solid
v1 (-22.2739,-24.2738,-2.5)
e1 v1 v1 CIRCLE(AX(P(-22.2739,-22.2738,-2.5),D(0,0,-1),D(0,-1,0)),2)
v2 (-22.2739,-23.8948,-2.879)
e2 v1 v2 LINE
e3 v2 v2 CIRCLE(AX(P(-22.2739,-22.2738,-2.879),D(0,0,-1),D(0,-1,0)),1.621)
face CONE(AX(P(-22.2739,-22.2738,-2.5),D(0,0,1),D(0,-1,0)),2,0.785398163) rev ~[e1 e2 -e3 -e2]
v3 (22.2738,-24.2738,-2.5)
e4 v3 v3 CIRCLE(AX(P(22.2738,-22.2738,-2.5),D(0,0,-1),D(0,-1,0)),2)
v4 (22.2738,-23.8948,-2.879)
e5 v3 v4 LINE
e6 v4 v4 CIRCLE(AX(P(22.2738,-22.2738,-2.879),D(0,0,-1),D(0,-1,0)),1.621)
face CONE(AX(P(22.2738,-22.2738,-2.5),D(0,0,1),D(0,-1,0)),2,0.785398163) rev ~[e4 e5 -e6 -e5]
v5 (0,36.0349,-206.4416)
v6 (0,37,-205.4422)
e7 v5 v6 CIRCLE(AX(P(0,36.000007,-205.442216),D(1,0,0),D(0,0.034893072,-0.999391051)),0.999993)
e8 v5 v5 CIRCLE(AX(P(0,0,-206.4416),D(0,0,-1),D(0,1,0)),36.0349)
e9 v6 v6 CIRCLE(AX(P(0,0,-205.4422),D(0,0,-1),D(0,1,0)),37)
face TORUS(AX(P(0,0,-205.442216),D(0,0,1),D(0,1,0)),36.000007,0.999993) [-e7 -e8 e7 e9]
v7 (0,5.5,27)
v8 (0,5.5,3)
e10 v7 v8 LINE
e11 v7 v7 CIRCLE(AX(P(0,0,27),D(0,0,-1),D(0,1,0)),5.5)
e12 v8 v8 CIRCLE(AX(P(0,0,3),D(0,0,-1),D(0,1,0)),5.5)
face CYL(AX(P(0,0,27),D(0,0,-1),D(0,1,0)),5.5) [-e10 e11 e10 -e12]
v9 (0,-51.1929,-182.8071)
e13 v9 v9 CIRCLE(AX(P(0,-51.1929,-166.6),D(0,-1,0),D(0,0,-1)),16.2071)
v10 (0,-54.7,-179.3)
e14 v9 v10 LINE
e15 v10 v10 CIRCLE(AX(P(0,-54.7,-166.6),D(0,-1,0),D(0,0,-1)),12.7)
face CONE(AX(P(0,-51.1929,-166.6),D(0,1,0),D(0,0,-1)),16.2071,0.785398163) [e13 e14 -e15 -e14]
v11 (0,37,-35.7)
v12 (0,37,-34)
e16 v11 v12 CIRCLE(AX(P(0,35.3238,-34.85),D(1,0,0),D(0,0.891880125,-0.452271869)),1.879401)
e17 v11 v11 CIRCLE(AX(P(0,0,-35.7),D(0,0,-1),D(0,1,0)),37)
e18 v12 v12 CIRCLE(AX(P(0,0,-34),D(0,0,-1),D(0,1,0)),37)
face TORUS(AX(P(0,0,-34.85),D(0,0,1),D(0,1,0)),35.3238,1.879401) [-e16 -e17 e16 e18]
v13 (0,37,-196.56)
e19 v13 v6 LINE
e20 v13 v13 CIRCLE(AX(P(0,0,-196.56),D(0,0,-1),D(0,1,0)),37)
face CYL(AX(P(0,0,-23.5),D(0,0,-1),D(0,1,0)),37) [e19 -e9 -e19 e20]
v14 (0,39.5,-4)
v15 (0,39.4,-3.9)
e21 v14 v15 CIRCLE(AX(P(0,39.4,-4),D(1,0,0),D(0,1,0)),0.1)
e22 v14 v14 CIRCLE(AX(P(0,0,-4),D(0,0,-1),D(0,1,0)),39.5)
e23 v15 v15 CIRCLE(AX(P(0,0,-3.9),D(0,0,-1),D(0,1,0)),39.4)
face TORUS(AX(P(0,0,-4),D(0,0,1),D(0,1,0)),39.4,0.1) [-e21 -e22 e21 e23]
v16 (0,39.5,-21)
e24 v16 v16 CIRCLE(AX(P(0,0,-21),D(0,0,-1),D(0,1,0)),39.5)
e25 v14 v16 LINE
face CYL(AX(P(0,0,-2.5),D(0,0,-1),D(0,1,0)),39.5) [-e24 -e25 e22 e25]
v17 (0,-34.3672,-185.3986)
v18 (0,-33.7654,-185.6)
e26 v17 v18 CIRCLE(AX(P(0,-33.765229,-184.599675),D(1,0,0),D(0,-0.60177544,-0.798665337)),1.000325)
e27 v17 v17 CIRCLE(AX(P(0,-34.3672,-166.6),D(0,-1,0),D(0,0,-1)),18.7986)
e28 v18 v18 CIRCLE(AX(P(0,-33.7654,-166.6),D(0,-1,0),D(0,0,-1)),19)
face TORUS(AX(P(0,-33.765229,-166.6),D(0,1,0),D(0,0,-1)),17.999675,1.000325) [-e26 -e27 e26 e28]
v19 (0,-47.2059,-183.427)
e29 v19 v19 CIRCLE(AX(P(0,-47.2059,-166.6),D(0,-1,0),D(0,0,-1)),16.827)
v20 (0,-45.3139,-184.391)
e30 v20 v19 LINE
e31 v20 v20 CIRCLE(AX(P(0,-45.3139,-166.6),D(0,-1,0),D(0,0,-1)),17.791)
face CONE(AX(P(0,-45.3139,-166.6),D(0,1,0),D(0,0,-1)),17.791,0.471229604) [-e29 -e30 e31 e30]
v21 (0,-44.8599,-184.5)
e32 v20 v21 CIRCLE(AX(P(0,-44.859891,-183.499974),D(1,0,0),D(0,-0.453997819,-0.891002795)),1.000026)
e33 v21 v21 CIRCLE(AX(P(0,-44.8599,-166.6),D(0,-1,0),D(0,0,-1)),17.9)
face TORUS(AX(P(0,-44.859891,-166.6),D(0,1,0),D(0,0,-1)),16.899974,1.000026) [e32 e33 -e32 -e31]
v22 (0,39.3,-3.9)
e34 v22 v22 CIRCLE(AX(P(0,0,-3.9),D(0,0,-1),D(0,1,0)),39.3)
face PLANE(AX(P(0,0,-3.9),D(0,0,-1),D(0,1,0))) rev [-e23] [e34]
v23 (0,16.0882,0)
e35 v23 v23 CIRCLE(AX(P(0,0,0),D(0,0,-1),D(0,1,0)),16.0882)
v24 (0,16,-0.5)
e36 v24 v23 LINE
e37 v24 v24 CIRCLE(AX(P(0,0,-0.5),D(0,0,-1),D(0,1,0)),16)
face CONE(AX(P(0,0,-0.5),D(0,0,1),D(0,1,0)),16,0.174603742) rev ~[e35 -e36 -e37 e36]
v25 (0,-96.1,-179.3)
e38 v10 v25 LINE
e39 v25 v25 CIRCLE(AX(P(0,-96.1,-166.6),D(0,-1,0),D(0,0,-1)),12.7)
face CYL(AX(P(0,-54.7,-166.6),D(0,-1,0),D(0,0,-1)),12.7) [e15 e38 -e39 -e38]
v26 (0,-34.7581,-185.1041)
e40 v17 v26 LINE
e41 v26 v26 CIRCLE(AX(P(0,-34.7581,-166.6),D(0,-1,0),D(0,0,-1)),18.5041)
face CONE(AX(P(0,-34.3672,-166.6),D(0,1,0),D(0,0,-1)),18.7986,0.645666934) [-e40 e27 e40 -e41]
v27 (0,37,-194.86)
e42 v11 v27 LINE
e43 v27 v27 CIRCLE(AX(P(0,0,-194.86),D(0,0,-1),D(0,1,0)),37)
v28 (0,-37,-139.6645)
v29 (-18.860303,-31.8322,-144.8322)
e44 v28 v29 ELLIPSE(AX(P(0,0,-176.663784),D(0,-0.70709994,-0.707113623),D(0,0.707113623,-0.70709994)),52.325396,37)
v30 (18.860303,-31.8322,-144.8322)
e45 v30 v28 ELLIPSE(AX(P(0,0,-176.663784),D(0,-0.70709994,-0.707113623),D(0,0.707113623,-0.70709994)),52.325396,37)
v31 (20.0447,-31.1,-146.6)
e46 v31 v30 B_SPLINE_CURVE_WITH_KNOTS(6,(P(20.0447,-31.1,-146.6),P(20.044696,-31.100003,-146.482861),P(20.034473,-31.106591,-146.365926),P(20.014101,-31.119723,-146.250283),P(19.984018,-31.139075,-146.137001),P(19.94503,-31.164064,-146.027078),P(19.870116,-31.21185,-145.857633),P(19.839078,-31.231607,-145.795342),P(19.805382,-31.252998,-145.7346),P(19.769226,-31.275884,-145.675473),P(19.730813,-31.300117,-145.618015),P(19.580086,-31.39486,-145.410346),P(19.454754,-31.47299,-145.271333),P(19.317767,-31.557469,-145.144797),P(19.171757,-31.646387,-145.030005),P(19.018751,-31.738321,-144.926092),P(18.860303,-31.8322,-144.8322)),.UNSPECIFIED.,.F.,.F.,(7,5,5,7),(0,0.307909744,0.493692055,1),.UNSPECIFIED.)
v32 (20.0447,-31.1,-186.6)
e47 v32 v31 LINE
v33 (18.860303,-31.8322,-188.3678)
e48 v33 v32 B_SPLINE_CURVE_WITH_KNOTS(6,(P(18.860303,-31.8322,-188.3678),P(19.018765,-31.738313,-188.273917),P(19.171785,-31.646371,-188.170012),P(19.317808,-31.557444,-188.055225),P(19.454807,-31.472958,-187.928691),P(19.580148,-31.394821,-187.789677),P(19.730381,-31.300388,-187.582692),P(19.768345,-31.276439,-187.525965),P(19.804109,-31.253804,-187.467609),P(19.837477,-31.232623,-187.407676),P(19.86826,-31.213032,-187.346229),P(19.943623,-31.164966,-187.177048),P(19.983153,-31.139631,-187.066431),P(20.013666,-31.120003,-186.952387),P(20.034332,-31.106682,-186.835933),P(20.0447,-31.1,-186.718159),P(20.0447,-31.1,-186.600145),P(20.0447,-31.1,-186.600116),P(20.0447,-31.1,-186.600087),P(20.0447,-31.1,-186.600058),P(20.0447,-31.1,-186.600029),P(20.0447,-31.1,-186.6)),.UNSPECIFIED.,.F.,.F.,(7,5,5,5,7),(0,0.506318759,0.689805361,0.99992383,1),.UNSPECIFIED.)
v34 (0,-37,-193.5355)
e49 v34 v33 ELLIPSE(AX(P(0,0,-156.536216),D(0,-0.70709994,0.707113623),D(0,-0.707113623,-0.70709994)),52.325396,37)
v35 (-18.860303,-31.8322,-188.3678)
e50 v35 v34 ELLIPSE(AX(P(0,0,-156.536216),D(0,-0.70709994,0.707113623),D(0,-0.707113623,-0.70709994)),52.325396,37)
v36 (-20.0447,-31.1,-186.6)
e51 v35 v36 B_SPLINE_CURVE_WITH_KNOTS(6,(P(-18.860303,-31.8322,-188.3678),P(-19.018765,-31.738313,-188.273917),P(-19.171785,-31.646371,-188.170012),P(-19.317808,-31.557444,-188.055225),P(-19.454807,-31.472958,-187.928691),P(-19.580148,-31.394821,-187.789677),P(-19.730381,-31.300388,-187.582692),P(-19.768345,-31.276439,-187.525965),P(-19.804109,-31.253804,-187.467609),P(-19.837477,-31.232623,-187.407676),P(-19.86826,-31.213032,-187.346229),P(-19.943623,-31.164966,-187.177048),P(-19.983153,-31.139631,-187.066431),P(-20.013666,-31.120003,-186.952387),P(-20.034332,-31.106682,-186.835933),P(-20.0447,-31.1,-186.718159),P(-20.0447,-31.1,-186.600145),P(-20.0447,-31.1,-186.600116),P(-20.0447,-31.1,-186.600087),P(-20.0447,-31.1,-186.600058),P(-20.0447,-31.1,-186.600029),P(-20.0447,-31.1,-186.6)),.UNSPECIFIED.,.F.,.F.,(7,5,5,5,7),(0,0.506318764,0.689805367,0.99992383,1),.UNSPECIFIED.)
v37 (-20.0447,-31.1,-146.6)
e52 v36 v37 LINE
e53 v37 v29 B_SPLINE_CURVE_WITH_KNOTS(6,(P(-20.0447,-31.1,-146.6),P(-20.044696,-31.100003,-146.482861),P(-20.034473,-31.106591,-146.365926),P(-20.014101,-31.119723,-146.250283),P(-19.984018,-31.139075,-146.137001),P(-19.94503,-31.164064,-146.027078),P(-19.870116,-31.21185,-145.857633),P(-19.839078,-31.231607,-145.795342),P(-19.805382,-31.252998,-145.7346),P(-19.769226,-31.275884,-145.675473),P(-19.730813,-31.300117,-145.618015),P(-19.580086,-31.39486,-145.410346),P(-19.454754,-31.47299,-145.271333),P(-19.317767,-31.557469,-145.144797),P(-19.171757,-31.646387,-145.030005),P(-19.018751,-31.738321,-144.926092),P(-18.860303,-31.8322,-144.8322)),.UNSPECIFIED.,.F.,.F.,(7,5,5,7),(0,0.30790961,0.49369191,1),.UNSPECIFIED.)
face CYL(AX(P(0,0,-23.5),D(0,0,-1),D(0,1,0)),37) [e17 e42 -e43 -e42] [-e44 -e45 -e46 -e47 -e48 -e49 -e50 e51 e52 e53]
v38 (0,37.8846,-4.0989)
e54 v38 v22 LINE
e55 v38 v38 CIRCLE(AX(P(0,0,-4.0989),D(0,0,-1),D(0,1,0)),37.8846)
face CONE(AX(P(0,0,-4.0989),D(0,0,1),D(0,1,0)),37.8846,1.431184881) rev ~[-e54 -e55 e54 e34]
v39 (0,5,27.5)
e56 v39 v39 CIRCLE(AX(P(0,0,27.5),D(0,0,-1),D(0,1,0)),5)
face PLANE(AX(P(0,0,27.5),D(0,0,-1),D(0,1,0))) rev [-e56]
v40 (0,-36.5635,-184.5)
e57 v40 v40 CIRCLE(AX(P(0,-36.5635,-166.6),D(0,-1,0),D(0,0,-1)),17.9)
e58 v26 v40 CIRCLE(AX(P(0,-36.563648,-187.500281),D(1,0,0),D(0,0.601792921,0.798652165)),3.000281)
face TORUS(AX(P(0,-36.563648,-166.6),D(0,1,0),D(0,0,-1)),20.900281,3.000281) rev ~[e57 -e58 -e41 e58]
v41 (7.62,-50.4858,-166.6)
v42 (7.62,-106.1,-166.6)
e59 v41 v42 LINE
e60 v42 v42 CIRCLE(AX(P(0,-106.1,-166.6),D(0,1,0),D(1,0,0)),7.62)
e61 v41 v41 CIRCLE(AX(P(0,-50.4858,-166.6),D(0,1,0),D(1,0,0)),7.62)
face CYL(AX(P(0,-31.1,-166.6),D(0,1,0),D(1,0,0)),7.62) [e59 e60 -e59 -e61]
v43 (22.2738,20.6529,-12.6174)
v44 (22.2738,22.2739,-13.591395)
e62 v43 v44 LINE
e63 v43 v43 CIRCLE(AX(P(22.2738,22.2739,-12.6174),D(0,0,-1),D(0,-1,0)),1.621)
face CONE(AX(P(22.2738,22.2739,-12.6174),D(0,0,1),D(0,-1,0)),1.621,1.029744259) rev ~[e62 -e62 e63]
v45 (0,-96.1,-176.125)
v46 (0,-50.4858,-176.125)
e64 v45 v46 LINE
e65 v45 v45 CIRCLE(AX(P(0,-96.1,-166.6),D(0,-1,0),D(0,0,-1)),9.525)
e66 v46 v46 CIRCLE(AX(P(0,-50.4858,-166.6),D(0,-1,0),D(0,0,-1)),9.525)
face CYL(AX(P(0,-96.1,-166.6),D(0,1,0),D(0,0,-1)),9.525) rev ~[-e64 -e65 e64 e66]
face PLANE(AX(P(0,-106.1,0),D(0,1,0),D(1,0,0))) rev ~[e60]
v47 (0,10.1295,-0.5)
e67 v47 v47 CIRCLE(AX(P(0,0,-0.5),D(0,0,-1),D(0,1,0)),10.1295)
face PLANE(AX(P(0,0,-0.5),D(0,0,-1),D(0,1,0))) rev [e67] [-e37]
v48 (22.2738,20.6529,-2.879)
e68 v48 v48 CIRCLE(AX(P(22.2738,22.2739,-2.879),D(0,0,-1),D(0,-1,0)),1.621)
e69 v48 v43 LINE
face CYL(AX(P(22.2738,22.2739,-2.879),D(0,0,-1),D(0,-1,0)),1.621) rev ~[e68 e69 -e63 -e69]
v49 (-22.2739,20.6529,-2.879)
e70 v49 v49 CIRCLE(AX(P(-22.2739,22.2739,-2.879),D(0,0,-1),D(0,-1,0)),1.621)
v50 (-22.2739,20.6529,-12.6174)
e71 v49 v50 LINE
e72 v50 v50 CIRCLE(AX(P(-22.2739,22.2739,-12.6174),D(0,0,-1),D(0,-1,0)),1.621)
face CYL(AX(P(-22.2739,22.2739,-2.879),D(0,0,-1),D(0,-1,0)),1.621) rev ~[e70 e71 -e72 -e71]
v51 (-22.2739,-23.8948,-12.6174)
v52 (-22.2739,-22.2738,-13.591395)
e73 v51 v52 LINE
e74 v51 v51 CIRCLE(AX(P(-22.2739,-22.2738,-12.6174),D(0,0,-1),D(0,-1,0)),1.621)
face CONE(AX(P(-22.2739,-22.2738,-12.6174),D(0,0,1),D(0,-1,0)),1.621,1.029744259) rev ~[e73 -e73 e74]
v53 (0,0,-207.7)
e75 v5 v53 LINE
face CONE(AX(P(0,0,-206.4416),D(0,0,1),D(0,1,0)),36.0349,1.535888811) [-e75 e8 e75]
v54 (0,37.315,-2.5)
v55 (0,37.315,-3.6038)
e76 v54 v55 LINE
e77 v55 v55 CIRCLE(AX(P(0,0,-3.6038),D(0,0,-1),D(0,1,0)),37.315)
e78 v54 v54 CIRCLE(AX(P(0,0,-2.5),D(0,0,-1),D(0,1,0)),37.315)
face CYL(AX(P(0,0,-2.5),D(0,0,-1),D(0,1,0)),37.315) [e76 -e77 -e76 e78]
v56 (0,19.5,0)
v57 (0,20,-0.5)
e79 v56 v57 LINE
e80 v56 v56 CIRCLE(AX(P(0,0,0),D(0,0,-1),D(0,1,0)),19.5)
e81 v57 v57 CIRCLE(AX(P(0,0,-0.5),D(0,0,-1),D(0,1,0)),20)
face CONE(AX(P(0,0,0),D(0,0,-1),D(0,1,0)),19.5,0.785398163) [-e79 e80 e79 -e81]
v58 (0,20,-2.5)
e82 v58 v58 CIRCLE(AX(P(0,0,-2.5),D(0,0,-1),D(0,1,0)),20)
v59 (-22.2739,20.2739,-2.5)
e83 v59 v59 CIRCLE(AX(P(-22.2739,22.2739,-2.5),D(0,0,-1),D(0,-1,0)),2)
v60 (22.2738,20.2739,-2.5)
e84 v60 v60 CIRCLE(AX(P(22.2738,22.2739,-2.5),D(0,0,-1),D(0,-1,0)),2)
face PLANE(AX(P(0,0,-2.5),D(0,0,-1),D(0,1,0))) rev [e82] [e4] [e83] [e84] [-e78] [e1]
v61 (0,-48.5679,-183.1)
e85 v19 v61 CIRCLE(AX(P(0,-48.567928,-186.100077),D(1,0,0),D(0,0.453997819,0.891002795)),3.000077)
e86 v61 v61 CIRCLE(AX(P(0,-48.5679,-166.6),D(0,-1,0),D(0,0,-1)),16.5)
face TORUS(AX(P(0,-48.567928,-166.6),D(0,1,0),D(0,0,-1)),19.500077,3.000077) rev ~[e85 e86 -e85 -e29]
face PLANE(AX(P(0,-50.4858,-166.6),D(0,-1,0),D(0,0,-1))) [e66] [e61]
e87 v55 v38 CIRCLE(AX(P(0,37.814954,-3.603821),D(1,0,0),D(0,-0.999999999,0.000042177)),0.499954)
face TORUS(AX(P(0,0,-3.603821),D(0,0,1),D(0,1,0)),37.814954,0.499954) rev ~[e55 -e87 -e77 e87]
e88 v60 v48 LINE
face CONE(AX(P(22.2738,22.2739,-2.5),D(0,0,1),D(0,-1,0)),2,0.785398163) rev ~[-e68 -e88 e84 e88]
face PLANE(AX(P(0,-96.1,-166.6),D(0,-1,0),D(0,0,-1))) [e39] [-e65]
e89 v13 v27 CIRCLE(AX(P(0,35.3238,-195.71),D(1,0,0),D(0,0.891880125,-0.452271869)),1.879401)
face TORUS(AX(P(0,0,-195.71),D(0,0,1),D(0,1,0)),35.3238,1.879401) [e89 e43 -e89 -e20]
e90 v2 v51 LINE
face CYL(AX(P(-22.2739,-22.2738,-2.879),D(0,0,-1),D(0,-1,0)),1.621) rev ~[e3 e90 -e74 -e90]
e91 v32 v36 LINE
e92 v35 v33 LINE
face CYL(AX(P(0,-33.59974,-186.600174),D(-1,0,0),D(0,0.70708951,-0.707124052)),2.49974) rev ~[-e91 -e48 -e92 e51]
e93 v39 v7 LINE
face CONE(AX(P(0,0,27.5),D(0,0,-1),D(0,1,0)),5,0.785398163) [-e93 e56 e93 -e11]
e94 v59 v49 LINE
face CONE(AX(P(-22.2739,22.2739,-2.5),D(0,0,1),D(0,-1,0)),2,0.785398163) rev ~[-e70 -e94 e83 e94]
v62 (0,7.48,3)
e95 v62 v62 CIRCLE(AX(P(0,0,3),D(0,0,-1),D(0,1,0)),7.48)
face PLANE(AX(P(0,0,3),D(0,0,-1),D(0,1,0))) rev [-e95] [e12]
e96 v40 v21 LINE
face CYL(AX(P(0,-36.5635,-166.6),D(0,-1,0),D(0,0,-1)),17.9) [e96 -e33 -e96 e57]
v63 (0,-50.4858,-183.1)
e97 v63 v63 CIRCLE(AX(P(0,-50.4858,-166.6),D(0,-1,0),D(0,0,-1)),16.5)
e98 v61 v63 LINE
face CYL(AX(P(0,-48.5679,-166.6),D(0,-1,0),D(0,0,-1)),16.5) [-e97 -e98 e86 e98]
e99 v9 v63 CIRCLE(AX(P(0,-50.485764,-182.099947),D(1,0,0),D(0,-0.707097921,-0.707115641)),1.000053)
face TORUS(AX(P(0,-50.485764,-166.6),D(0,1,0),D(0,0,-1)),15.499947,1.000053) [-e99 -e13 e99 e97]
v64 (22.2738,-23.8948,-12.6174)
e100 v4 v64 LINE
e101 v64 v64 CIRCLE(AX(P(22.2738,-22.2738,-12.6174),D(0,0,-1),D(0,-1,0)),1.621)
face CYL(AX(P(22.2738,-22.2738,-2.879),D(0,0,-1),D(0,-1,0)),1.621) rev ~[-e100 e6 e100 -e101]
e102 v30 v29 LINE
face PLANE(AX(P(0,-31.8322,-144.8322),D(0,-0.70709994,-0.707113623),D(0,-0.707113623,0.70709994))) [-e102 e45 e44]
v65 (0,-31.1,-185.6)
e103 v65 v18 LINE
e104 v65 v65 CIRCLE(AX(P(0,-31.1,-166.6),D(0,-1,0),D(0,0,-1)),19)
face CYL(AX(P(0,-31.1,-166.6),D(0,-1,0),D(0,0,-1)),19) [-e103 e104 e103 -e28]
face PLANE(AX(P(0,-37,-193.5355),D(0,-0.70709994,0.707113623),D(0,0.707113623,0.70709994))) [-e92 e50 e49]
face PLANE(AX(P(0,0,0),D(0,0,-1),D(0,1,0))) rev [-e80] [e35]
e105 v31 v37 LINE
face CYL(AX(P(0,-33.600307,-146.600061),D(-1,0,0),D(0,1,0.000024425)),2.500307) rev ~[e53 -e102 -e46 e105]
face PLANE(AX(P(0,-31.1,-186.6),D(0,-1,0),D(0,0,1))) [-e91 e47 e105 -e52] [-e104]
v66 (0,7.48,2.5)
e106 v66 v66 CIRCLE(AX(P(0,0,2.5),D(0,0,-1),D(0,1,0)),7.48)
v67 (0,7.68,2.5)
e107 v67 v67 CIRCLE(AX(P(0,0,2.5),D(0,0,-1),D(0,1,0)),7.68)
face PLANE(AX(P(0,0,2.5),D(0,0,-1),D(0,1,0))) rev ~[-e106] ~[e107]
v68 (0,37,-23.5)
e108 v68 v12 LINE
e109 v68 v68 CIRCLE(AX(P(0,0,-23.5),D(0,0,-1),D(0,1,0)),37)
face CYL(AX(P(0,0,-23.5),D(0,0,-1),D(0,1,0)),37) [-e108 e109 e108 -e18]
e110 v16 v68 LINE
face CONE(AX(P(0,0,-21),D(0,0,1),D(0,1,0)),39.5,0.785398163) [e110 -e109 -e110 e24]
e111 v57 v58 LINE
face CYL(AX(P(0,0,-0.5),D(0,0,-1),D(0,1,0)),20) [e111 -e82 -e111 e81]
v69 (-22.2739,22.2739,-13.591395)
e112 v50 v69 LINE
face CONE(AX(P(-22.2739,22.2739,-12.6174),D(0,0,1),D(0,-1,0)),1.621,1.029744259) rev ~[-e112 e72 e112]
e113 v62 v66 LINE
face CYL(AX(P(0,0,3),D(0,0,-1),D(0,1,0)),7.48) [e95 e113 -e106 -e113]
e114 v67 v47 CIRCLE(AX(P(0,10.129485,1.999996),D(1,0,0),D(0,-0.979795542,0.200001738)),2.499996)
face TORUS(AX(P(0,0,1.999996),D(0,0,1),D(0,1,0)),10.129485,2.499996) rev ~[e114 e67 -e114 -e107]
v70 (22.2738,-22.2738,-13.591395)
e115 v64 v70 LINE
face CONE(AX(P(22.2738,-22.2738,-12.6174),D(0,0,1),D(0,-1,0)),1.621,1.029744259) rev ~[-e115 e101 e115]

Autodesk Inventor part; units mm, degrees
ref_plane "YZ Plane" through (0, 0, 0) normal (1, 0, 0) x (0, 1, 0)
ref_plane "XZ Plane" through (0, 0, 0) normal (0, 1, 0) x (-1, 0, 0)
ref_plane "XY Plane" through (0, 0, 0) normal (0, 0, 1) x (1, 0, 0)
sketch "Sketch1" plane through (0, 0, 0) normal (1, 0, 0) x (0, 0, -1)
  line L0 (207.7, 0) -> (0, 0)
  line L1 (0.5, 0) -> (0.5, 16)
  line L2 (0.5, 16) -> (0, 16.0882)
  line L3 (0, 16.0882) -> (0, 19.5)
  line L4 (0, 19.5) -> (0.5, 20)
  line L5 (0.5, 20) -> (2.5, 20)
  line L6 (2.5, 20) -> (2.5, 39.5)
  line L7 (2.5, 39.5) -> (21, 39.5)
  line L8 (21, 39.5) -> (23.5, 37)
  line L9 (23.5, 37) -> (205.4422, 37)
  arc A0 (206.4416, 36.0349) -> (205.4422, 37) centre (205.4422, 36) ccw
  line L10 (206.4416, 36.0349) -> (207.7, 0)
  line L11 (207.7, 0) -> (0.5, 0)
revolve "Revolution1" add sketch "Sketch1" angle 360 about axis through (0, 0, -207.7) along (0, 0, -1)
sketch "Sketch2" plane through (0, 0, 0) normal (1, 0, 0) x (0, 0, -1)
  line L0 (0, 0) -> (-27.5, 0)
  line L1 (-27.5, 0) -> (-27.5, 5)
  line L2 (-27.5, 5) -> (-27, 5.5)
  line L3 (-27, 5.5) -> (-3, 5.5)
  line L4 (-3, 5.5) -> (-3, 7.48)
  line L5 (-3, 7.48) -> (0.5, 7.48)
  line L6 (0.5, 7.48) -> (0.5, 0)
  line L7 (0.5, 0) -> (-27.5, 0)
revolve "Revolution2" add sketch "Sketch2" angle 360 about axis through (0, 0, 0) along (0, 0, -1)
sketch "Sketch3" plane through (0, 0, 0) normal (1, 0, 0) x (0, 0, -1)
  line L0 (0.5, 0) -> (-2.5, 0)
  line L1 (-2.5, 7.48) -> (0.5, 7.48)
  line L2 (0.5, 7.48) -> (0.5, 10.1295)
  arc A0 (-2.5, 7.68) -> (0.5, 10.1295) centre (-2, 10.1295) ccw
  line L3 (-2.5, 7.68) -> (-2.5, 7.48)
revolve "Revolution3" add sketch "Sketch3" angle 360 about axis through (0, 0, -0.5) along (0, 0, -1)
sketch "Sketch5" plane through (0, 0, 0) normal (1, 0, 0) x (0, 0, -1)
  line L0 (0, 0) -> (-51.7156, 0)
  line L1 (2.5, 39.5) -> (2.5, 37.315)
  line L2 (2.5, 37.315) -> (3.6038, 37.315)
  arc A0 (3.6038, 37.315) -> (4.0989, 37.8846) centre (3.6038, 37.815) ccw
  line L3 (4.0989, 37.8846) -> (3.9, 39.3)
  line L4 (3.9, 39.3) -> (3.9, 39.4)
  arc A1 (4, 39.5) -> (3.9, 39.4) centre (4, 39.4) ccw
  line L5 (4, 39.5) -> (2.5, 39.5)
revolve "Revolution4" cut sketch "Sketch5" angle 360 about axis through (0, 0, 0) along (0, 0, -1)
sketch "Sketch6" plane through (0, 0, -2.5) normal (0, 0, 1) x (1, 0, 0)
  point P0 (-22.2739, 22.2739)
hole "Hole1" at (-22.2739, 22.2739, -2.5) direction (0, 0, -1) diameter 3.242 depth 10.1174 tip angle 118 countersink diameter 4 countersink angle 90 thread size "M4x0.7" class "6H" standard "ISO Metric profile"
pattern_linear "Rectangular Pattern1" count 2 spacing 44.5477 along (1, 0, 0) count 2 spacing 44.5477 along (0, -1, 0) of "Hole1"
sketch "Sketch14" plane through (0, 0, 0) normal (1, 0, 0) x (0, 0, -1)
  line L0 (139.6645, -37) -> (193.5355, -37)
  line L1 (193.5355, -37) -> (188.3678, -31.8322)
  arc A0 (188.3678, -31.8322) -> (186.6, -31.1) centre (186.6, -33.6) ccw
  line L2 (186.6, -31.1) -> (146.6, -31.1)
  arc A1 (146.6, -31.1) -> (144.8322, -31.8322) centre (146.6, -33.6) ccw
  line L3 (144.8322, -31.8322) -> (139.6645, -37)
extrude "Extrusion1" cut sketch "Sketch14" along normal mid plane 40.0894
sketch "Sketch18" plane through (0, -31.1, 0) normal (0, 1, 0) x (1, 0, 0)
  circle A0 centre (0, 166.6) radius 7.62
extrude "Extrusion3" add sketch "Sketch18" against normal blind 75
sketch "Sketch19" plane through (0, 0, 0) normal (1, 0, 0) x (0, 0, -1)
  line L0 (166.6, -50.4858) -> (166.6, -31.1)
  line L1 (166.6, -31.1) -> (185.6, -31.1)
  line L2 (185.6, -31.1) -> (185.6, -33.7654)
  arc A0 (185.3986, -34.3672) -> (185.6, -33.7654) centre (184.6, -33.7654) ccw
  line L3 (185.3986, -34.3672) -> (185.1041, -34.7581)
  arc A1 (185.1041, -34.7581) -> (184.5, -36.5635) centre (187.5, -36.5635) ccw
  line L4 (184.5, -36.5635) -> (184.5, -44.8599)
  arc A2 (184.391, -45.3139) -> (184.5, -44.8599) centre (183.5, -44.8599) ccw
  line L5 (184.391, -45.3139) -> (183.427, -47.2059)
  arc A3 (183.427, -47.2059) -> (183.1, -48.5679) centre (186.1, -48.5679) ccw
  line L6 (183.1, -48.5679) -> (183.1, -50.4858)
  arc A4 (182.8071, -51.1929) -> (183.1, -50.4858) centre (182.1, -50.4858) ccw
  line L7 (182.8071, -51.1929) -> (179.3, -54.7)
  line L8 (179.3, -54.7) -> (179.3, -96.1)
  line L9 (179.3, -96.1) -> (176.125, -96.1)
  line L10 (176.125, -96.1) -> (176.125, -50.4858)
  line L11 (176.125, -50.4858) -> (166.6, -50.4858)
  line L12 (166.6, -50.4858) -> (166.6, -31.1)
revolve "Revolution5" add sketch "Sketch19" angle 360 about axis through (0, -50.4858, -166.6) along (0, -1, 0)
sketch "Sketch20" plane through (0, 0, 0) normal (1, 0, 0) x (0, 0, -1)
  line L0 (193.6472, 0) -> (0, 0)
  line L1 (34, 37) -> (35.7, 37)
  arc A0 (35.7, 37) -> (34, 37) centre (34.85, 35.3238) ccw
revolve "Revolution6" add sketch "Sketch20" angle 360 about axis through (0, 0, -193.6472) along (0, 0, -1)
sketch "Sketch_1" plane through (0, 0, 0) normal (1, 0, 0) x (0, 0, -1)
  line L0 (193.6472, 0) -> (0, 0)
  line L1 (194.86, 37) -> (196.56, 37)
  arc A0 (196.56, 37) -> (194.86, 37) centre (195.71, 35.3238) ccw
revolve "Revolution7" add sketch "Sketch_1" angle 360 about axis through (0, 0, -193.6472) along (0, 0, -1)
properties part number "AKMH23x-CCTNCAFK" material "Stainless Steel"
